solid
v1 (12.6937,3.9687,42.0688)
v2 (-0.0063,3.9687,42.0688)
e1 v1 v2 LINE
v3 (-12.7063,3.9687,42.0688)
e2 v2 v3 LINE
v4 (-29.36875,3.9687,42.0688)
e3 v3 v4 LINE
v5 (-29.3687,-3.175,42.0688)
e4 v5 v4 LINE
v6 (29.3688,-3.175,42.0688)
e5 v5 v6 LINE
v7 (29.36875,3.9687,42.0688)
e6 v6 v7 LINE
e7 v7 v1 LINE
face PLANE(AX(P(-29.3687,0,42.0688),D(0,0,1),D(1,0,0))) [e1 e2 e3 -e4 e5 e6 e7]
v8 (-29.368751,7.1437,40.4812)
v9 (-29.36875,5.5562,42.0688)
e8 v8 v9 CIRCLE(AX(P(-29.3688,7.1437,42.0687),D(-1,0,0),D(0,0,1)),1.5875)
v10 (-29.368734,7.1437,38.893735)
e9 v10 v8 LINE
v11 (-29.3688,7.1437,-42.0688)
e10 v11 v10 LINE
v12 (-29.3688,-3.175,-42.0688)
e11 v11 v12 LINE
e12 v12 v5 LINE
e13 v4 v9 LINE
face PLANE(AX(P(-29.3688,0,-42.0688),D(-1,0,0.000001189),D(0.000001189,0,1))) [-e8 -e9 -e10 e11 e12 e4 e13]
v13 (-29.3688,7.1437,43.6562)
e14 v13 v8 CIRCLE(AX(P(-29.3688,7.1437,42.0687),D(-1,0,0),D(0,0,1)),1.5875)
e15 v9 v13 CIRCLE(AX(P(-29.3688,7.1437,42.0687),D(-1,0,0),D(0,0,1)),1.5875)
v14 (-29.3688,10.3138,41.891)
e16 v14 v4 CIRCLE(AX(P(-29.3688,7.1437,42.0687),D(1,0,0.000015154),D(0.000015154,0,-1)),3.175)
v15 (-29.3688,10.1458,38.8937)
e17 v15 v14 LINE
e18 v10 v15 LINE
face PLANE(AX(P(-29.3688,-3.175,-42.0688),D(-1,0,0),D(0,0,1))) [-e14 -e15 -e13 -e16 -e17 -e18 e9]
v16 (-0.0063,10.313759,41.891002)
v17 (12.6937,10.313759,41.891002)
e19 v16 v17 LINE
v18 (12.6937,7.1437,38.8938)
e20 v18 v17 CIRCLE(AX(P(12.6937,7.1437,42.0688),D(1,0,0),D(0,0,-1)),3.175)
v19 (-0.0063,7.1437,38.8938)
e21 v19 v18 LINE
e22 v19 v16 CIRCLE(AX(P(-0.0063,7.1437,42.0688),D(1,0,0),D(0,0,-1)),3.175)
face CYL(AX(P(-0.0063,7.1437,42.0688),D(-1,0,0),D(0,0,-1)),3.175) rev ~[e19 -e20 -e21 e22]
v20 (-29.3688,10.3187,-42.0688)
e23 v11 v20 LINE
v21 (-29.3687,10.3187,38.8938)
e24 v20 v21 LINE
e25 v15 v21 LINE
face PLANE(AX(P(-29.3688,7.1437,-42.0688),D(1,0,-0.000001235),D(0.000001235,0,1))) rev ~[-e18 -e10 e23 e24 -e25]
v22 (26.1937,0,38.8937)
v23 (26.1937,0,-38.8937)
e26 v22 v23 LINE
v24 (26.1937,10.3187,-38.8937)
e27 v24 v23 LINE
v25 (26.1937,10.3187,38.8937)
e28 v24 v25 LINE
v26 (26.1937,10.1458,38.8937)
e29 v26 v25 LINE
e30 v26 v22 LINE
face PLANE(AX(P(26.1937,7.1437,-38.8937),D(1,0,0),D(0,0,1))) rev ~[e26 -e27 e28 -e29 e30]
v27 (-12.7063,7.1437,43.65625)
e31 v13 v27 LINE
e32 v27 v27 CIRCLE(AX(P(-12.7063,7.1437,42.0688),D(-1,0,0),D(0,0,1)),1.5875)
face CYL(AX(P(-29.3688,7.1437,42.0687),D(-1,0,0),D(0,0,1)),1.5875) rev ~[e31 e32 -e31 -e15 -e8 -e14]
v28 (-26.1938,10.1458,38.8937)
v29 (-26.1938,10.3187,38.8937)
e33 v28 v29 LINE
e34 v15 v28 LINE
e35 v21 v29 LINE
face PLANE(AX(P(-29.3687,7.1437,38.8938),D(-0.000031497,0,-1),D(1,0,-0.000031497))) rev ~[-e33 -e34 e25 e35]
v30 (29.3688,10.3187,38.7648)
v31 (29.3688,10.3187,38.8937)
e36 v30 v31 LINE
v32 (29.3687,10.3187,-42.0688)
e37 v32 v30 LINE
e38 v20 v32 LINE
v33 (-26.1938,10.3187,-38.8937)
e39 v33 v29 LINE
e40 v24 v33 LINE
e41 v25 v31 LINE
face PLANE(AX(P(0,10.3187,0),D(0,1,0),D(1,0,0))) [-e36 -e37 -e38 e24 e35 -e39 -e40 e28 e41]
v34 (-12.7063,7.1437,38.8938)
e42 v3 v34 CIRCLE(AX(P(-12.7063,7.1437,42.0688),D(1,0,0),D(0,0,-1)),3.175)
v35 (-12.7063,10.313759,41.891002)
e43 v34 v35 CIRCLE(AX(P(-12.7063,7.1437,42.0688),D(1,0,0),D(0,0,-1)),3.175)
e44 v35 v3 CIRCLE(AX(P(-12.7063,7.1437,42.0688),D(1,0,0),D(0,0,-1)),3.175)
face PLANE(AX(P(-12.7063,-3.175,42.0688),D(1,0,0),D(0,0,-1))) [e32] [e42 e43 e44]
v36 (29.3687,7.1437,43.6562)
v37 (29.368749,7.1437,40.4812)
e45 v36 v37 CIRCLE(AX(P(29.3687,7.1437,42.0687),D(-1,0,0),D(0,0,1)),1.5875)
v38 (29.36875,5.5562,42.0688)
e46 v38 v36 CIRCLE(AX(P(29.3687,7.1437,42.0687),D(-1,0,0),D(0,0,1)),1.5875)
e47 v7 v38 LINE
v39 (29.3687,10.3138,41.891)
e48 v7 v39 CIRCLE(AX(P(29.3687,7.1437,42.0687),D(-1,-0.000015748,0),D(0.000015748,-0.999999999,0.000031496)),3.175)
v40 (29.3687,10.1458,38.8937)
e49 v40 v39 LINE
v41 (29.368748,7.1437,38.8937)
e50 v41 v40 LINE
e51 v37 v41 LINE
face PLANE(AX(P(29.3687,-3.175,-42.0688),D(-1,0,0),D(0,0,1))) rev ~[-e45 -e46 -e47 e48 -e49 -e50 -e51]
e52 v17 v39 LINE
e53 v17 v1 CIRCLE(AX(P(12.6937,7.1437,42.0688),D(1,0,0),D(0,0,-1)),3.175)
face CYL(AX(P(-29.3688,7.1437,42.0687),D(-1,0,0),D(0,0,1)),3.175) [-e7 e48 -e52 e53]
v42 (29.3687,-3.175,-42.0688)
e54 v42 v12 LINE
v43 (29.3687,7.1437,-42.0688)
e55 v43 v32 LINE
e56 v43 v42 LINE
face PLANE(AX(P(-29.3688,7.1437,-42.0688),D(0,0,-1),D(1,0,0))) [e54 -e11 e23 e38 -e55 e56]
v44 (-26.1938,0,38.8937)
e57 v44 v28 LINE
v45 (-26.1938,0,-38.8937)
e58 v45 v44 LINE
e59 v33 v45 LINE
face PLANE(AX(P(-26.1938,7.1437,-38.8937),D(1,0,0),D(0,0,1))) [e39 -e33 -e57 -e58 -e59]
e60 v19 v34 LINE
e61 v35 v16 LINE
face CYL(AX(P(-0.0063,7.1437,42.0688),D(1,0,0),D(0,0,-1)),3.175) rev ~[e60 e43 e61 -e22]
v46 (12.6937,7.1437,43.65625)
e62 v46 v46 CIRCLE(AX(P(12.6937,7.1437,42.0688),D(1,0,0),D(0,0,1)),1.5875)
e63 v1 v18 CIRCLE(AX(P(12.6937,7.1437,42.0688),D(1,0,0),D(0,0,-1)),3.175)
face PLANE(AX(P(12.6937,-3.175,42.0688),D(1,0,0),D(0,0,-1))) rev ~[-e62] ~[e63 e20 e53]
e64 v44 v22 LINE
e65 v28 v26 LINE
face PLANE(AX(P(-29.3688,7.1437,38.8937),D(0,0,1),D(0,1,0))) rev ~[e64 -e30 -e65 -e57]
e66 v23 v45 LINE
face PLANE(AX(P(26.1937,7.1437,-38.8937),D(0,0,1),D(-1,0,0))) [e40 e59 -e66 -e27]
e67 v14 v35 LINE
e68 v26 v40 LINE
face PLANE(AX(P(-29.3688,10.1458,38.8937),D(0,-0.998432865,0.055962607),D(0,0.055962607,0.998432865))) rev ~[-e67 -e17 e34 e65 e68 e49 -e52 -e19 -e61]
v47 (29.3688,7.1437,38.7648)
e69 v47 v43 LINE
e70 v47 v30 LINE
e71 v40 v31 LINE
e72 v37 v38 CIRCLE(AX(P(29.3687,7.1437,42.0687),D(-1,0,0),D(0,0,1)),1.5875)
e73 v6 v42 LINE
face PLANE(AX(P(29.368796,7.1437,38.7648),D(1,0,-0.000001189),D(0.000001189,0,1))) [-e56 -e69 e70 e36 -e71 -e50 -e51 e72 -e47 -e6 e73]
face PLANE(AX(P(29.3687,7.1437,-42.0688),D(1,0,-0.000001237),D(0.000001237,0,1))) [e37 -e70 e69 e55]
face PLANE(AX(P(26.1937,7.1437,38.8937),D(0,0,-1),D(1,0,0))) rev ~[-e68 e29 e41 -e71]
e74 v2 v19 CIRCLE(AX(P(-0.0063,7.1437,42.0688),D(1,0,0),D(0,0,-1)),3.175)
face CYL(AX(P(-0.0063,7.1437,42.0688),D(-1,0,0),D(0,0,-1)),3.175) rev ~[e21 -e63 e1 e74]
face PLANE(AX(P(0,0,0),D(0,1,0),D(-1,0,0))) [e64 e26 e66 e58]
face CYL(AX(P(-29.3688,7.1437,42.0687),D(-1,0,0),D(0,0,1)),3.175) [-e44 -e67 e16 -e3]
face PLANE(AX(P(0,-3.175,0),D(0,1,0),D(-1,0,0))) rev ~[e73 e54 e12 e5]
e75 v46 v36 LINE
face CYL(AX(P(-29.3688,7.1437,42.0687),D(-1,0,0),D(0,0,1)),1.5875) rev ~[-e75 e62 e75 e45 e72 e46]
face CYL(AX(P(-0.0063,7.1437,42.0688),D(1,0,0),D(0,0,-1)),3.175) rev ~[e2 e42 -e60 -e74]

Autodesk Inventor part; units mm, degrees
ref_plane "YZ Plane" through (0, 0, 0) normal (1, 0, 0) x (0, 1, 0)
ref_plane "XZ Plane" through (0, 0, 0) normal (0, 1, 0) x (-1, 0, 0)
ref_plane "XY Plane" through (0, 0, 0) normal (0, 0, 1) x (1, 0, 0)
sketch "Sketch2" plane through (0, 0, 0) normal (0, 1, 0) x (-1, 0, 0)
  line L0 (29.3687, 42.0688) -> (-29.3688, 42.0688)
  line L1 (-29.3688, 42.0688) -> (-29.3687, -42.0688)
  line L2 (-29.3687, -42.0688) -> (29.3688, -42.0688)
  line L3 (29.3688, -42.0688) -> (29.3687, 42.0688)
  line L4 (29.3687, 42.0688) -> (-29.3687, -42.0688) construction
  line L5 (-29.3688, 42.0688) -> (29.3688, -42.0688) construction
  point P0 (0, 0)
  dimension "d4" = 58.7375
  dimension "d5" = 84.1375
extrude "Extrusion1" add sketch "Sketch2" against normal blind 3.175
sketch "Sketch3" plane through (0, 0, 0) normal (0, 1, 0) x (1, 0, 0)
  line L0 (29.3688, -42.0688) -> (-29.3687, -42.0688) projected
  line L1 (-29.3688, 42.0688) -> (29.3687, 42.0688) projected
  line L2 (-29.3687, -42.0688) -> (29.3687, -42.0688)
  line L3 (29.3687, -42.0688) -> (29.3687, 42.0688)
  line L4 (29.3687, 42.0688) -> (-29.3687, 42.0688)
  line L5 (-29.3687, 42.0688) -> (-29.3687, -42.0688)
  line L6 (-26.1938, -38.8937) -> (26.1937, -38.8937)
  line L7 (26.1937, -38.8937) -> (26.1937, 38.8937)
  line L8 (26.1937, 38.8937) -> (-26.1938, 38.8937)
  line L9 (-26.1938, 38.8937) -> (-26.1938, -38.8937)
  line L10 (-26.1938, -38.8937) -> (26.1937, 38.8937) construction
  line L11 (26.1937, -38.8937) -> (-26.1938, 38.8937) construction
  point P0 (0, 0)
  dimension "d8" = 3.175
  dimension "d9" = 3.175
extrude "Extrusion2" add sketch "Sketch3" along normal blind 7.1437
sketch "Sketch6" plane through (-29.3688, -3.175, -42.0688) normal (-1, 0, 0) x (0, 0, 1)
  line L0 (0, 10.3187) -> (84.1375, 10.3187) projected
  line L1 (84.1375, 10.3187) -> (84.1375, 0) projected
  circle A0 centre (84.1375, 10.3187) radius 3.175
  point P0 (42.0688, 3.175)
  dimension "d16" = 6.35
extrude "Extrusion5" add sketch "Sketch6" against normal blind 58.7375
sketch "Sketch8" plane through (-29.3688, -3.175, -42.0688) normal (-1, 0, 0) x (0, 0, 1)
  arc A0 (84.1375, 7.1437) -> (80.9625, 10.3187) centre (84.1375, 10.3187) ccw projected
  circle A1 centre (84.1375, 10.3187) radius 1.5875
  point P0 (42.0688, 3.175)
  dimension "d21" = 3.175
extrude "Extrusion6" cut sketch "Sketch8" against normal blind 58.7375
sketch "Sketch11" plane through (0, 7.1437, 0) normal (0, 1, 0) x (1, 0, 0)
  line L0 (-29.3688, 42.0688) -> (29.3687, 42.0688) projected
  line L1 (-29.3688, 42.0688) -> (29.3687, 42.0688)
  line L2 (29.3687, 42.0688) -> (29.3688, -38.7648)
  line L3 (29.3687, 42.0688) -> (29.3688, -42.0688) projected
  line L4 (26.1937, -38.8937) -> (29.3688, -38.8937) projected
  line L5 (26.1937, 38.8937) -> (26.1937, -38.8937) projected
  line L6 (26.1937, -38.8937) -> (26.1937, 38.8937)
  line L7 (26.1937, 38.8937) -> (-26.1938, 38.8937)
  line L8 (-29.3687, -38.8938) -> (-26.1938, -38.8937) projected
  line L9 (-26.1938, 38.8937) -> (-26.1938, -38.8937)
  line L10 (-26.1938, -38.8937) -> (-29.3687, -38.8938)
  line L11 (-29.3688, 42.0688) -> (-29.3687, -38.8938) projected
  line L12 (-29.3687, -38.8938) -> (-29.3688, 42.0688)
  point P0 (0, 0)
extrude "Extrusion9" add sketch "Sketch11" along normal blind 3.175
sketch "Sketch12" plane through (-29.3688, -3.175, -42.0688) normal (-1, 0, 0) x (0, 0, 1)
  line L0 (80.9625, 3.175) -> (80.9625, 10.3187) projected
  line L1 (80.9625, 10.3187) -> (80.9625, 13.3208)
  arc A0 (84.1375, 7.1437) -> (80.9625, 10.3187) centre (84.1375, 10.3187) ccw projected
  line L2 (80.9625, 13.3208) -> (83.9598, 13.4888)
  point P0 (42.0688, 3.175)
extrude "Extrusion10" add sketch "Sketch12" against normal blind 58.7375
ref_plane "Work Plane1" through (-0.0063, -3.175, 42.0688) normal (1, 0, 0) x (0, 0, -1)
sketch "Sketch13" plane through (-0.0063, -3.175, 42.0688) normal (1, 0, 0) x (0, 0, -1)
  circle A0 centre (0, 10.3187) radius 1.5875 projected
  circle A1 centre (0, 10.3187) radius 3.175
  point P0 (42.0688, 3.175)
  dimension "d33" = 6.35
extrude "Extrusion11" cut sketch "Sketch13" along normal mid plane 25.4
equation "\"d4\" = 2 * materialWallThickness + cardDeckWidth + cardDeckAirGap"
equation "\"d5\" = 2 * materialWallThickness + cardDeckLength + cardDeckAirGap"
equation "\"d6\" = baseWallThickness"
equation "\"d8\" = baseWallThickness"
equation "\"d9\" = baseWallThickness"
equation "\"d10\" = 0.5 * cardDeckDepth"
equation "\"d19\" = d4"
equation "\"d22\" = d4"
equation "\"d30\" = d4"
equation "\"cardDeckWidth\" = 50.8"
equation "\"cardDeckLength\" = 76.2"
equation "\"d0\" = cardDeckWidth"
equation "\"d1\" = cardDeckLength"
equation "\"cardDeckDepth\" = 14.2875"
equation "\"d2\" = cardDeckDepth"
equation "\"d3\" = 0"
equation "\"materialWallThickness\" = 3.175"
equation "\"baseWallThickness\" = 3.175"
equation "\"cardDeckAirGap\" = 1.5875"
equation "\"hingeOuterDiam\" = 12.7"
equation "\"hingeInnerDiam\" = 6.35"
properties part number "TopHalfOfBoard" material "ABS Plastic"
